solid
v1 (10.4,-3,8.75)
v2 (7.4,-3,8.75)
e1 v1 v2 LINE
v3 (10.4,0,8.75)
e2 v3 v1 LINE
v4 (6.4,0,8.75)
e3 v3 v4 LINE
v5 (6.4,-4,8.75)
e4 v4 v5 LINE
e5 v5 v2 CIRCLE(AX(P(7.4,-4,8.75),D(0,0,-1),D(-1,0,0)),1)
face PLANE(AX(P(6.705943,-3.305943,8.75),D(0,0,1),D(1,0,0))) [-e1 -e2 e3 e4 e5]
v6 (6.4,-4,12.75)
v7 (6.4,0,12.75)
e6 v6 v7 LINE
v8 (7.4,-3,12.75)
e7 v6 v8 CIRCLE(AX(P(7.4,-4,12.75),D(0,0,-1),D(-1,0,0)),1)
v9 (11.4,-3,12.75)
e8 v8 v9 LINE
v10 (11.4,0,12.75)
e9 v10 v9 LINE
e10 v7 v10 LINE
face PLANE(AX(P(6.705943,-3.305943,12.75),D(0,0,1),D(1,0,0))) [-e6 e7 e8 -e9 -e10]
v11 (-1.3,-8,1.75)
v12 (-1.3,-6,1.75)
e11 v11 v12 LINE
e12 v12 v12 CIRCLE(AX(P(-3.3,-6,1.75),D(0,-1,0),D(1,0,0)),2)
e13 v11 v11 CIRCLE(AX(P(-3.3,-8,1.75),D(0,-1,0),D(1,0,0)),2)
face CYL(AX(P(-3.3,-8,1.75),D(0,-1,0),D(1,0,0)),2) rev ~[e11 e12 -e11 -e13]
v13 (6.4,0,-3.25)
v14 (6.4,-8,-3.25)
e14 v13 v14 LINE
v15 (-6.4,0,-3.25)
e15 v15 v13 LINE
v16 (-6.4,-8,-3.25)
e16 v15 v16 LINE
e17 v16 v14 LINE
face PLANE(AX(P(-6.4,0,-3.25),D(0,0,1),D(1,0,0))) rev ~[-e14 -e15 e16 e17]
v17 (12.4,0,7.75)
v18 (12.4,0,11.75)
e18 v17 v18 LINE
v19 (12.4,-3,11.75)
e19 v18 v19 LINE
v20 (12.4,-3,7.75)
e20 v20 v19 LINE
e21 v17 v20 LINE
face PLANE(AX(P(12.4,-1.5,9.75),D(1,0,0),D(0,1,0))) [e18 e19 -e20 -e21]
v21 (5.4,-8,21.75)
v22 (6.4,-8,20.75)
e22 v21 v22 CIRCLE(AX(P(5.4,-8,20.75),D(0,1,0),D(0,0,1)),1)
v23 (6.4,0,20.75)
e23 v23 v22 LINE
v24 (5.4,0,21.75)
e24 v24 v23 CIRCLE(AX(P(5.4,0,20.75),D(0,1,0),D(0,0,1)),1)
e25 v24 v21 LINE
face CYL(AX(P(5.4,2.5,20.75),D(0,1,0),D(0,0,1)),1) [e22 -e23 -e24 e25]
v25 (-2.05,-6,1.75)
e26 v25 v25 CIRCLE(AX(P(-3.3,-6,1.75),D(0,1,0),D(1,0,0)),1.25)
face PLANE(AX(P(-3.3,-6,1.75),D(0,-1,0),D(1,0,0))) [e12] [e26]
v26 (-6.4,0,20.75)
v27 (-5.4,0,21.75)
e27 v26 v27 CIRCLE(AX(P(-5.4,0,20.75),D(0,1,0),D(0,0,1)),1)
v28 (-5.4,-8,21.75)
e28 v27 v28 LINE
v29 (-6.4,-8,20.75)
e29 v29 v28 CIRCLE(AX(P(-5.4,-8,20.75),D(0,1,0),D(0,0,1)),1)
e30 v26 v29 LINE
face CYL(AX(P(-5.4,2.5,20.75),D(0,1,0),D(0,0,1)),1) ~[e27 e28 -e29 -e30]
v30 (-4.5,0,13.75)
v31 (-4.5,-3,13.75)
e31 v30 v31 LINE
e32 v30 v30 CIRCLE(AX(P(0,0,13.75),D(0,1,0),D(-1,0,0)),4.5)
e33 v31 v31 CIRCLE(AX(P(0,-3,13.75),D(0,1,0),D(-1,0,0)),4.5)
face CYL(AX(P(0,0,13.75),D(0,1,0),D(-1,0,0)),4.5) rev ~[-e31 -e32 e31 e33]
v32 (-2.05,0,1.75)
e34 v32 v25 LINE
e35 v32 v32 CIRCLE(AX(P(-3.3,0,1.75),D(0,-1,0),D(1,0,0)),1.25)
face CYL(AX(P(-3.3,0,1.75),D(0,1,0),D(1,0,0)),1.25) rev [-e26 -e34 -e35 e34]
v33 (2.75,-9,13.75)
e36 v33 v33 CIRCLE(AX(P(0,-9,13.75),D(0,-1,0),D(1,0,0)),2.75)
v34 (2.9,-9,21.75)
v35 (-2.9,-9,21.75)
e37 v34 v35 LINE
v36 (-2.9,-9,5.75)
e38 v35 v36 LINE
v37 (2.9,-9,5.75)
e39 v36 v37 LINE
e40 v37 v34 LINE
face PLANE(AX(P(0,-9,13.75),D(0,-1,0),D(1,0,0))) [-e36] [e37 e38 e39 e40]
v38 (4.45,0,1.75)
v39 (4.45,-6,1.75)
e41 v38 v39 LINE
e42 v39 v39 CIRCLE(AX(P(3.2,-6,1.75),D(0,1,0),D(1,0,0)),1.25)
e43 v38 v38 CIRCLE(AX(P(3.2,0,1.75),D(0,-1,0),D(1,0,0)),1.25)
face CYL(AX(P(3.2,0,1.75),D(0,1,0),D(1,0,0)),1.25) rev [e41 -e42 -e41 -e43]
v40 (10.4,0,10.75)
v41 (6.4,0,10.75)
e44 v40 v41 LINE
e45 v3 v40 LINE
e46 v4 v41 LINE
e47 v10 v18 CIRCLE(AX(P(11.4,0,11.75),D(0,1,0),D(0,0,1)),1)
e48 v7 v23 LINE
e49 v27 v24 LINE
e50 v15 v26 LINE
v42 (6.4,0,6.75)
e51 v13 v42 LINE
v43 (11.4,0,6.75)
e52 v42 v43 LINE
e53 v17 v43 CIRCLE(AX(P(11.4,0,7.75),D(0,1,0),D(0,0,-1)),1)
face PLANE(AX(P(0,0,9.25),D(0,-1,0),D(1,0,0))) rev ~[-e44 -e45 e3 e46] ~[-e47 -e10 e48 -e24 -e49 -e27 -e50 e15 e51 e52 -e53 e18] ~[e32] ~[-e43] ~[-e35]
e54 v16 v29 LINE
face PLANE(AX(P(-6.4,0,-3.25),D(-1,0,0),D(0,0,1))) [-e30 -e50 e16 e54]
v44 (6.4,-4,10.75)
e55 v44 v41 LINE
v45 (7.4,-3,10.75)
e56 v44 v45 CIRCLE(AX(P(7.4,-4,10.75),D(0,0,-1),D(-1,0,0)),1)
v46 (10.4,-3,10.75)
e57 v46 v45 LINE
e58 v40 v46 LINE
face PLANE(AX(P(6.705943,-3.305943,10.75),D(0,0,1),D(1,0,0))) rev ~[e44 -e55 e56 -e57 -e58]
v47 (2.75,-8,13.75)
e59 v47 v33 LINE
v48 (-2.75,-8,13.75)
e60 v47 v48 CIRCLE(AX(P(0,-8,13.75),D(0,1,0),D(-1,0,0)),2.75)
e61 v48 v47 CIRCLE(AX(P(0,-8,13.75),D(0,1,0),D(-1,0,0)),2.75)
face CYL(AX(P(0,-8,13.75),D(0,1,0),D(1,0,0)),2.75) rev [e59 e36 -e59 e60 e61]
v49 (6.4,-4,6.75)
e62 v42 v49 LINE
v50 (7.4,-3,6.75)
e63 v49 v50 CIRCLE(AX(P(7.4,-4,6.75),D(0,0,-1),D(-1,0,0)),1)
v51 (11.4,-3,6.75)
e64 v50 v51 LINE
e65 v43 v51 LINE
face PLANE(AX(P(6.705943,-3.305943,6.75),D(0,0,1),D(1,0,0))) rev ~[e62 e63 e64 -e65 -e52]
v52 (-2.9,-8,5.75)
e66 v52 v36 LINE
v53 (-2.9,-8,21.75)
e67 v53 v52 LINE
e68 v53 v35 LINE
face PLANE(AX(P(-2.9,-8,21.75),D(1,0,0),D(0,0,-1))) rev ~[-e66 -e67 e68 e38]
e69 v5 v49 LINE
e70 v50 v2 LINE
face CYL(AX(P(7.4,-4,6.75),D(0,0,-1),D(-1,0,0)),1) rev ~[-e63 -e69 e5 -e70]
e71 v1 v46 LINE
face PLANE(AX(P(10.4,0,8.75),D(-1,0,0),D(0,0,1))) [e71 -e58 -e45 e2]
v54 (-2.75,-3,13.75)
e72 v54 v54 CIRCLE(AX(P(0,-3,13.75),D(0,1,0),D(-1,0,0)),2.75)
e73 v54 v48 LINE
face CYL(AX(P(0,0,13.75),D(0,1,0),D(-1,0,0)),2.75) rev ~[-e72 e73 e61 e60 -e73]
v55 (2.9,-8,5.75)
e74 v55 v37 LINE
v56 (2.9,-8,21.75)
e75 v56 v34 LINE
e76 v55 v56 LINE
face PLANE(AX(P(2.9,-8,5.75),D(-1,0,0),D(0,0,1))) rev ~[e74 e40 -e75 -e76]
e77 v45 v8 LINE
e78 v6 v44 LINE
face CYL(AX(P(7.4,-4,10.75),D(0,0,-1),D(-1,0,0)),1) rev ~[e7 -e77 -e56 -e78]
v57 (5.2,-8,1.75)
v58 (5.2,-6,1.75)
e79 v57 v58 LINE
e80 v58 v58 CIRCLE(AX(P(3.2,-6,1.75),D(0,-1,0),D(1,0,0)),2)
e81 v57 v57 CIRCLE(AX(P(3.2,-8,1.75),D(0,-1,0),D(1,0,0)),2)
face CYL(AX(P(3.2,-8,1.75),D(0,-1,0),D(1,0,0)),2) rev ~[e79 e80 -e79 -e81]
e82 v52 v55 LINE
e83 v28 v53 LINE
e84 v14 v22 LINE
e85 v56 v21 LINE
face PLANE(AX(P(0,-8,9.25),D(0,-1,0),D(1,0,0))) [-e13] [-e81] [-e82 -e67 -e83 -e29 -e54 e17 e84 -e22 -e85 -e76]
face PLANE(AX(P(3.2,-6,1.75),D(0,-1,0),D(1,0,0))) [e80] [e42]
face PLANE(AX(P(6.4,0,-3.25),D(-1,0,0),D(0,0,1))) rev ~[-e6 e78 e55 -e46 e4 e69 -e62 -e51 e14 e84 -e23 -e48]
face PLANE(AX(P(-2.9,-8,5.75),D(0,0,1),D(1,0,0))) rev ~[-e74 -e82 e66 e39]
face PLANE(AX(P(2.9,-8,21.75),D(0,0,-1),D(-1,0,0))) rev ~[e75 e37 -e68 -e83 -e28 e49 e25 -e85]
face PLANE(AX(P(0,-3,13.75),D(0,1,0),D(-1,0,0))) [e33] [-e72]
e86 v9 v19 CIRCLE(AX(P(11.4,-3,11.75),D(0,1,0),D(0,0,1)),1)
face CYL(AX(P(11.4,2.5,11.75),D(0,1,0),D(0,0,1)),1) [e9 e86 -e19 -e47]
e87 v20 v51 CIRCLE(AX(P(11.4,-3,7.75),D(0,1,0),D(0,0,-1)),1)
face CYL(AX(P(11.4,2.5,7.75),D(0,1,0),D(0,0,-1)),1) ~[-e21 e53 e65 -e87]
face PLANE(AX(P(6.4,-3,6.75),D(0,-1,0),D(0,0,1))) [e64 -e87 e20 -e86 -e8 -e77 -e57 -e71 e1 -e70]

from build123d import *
from build123d import SkipClean  # not in build123d's __all__

# Parameters (mm, degrees)
F1_W          = 12.8
F1_H          = 25
F1_R          = 1.25
F2_DEPTH      = 8
F3_R          = 2.75
F4_DEPTH      = 8.001
F5_R          = 2
F6_DEPTH      = 2
F7_R          = 2.75
F8_DEPTH      = 1
F9_W          = 3
F9_H          = 6
F10_DEPTH     = 6
F11_W         = 4
F11_H         = 2
F12_DEPTH     = 3
F13_T1_DEPTH  = 2
F13_T3_DEPTH  = 2
F13_T8_DEPTH  = 4.5
F13_T13_DEPTH = 4.5
F13_T15_DEPTH = 8
F13_T17_DEPTH = 13
F14_R         = 4.5
F15_DEPTH     = 3


# Not quite as in the source:
# - a fillet or chamfer that OpenCascade refuses, or shapes differently, is made with other operations: its cross-section is extruded or revolved along the edge and cut away or added
# - after a boolean that leaves OpenCascade's solid faulty, fix() repairs it


with BuildPart() as f2:
    # F1 (on Front) → F2 (new body)
    with BuildSketch(Plane.XZ):
        with Locations((0, 9.25)):
            Rectangle(F1_W, F1_H)
        with Locations((-3.3, 1.75)):
            Circle(F1_R, mode=Mode.SUBTRACT)
        with Locations((3.2, 1.75)):
            Circle(F1_R, mode=Mode.SUBTRACT)
    extrude(amount=F2_DEPTH)

    # F3 (on face) → F4 (cut, through all)
    with BuildSketch(Plane(origin=(0, 0, 0), x_dir=(-1, 0, 0), z_dir=(0, 1, 0))):
        with Locations((0, 13.75)):
            Circle(F3_R)
    extrude(amount=-F4_DEPTH, mode=Mode.SUBTRACT)

    # F5 (on face) → F6 (cut)
    with BuildSketch(Plane.XZ.offset(8)):
        with Locations((-3.3, 1.75)):
            Circle(F5_R)
        with Locations((3.2, 1.75)):
            Circle(F5_R)
    extrude(amount=-F6_DEPTH, mode=Mode.SUBTRACT)

    # F7 (on face) → F8 (join)
    with BuildSketch(Plane.XZ.offset(8)):
        Polygon((-2.9, 5.75), (0, 5.75), (2.9, 5.75), (2.9, 21.75), (0, 21.75), (-2.9, 21.75), align=None)
        with Locations((0, 13.75)):
            Circle(F7_R, mode=Mode.SUBTRACT)
    with SkipClean():  # cleaning this boolean's faces spoils the solid; the shape is the same uncleaned
        extrude(amount=F8_DEPTH)

    # F9 (on face) → F10 (join)
    with BuildSketch(Plane.YZ.offset(6.4)):
        with Locations((-1.5, 9.75)):
            Rectangle(F9_W, F9_H)
    extrude(amount=F10_DEPTH)

    add(f2.part.fix(), mode=Mode.REPLACE)

    # F11 (on face) → F12 (cut, through all)
    with BuildSketch(Plane(origin=(0, 0, 0), x_dir=(-1, 0, 0), z_dir=(0, 1, 0))):
        with Locations((-8.4, 9.75)):
            Rectangle(F11_W, F11_H)
    extrude(amount=-F12_DEPTH, mode=Mode.SUBTRACT)

    add(f2.part.fix(), mode=Mode.REPLACE)

    # F13: fillet of radius 1 on 6 edges, made by hand

    # F13_s2 → F13_t1 (join)
    with BuildSketch(Plane.XY.offset(10.75)):
        with BuildLine():
            ThreePointArc((6.4, -4), (6.6928932188, -3.2928932188), (7.4, -3))
            Line((7.4, -3), (6.4, -3))
            Line((6.4, -3), (6.4, -4))
        make_face()
    extrude(amount=F13_T1_DEPTH)

    # F13_s4 → F13_t3 (join)
    with BuildSketch(Plane.XY.offset(6.75)):
        with BuildLine():
            ThreePointArc((6.4, -4), (6.6928932188, -3.2928932188), (7.4, -3))
            Line((7.4, -3), (6.4, -3))
            Line((6.4, -3), (6.4, -4))
        make_face()
    extrude(amount=F13_T3_DEPTH)


with BuildPart() as f13_tool6:
    # F13_s7 → F13_t8 (new body)
    with BuildSketch(Plane.XY.offset(12.75)):
        with BuildLine():
            ThreePointArc((6.4, -4), (6.6928932188, -3.2928932188), (7.4, -3))
            Line((7.4, -3), (6.4, -3))
            Line((6.4, -3), (6.4, -4))
        make_face()
    extrude(amount=-F13_T8_DEPTH)

    split(bisect_by=Plane.XY.offset(8.75), keep=Keep.BOTTOM)


with BuildPart() as f2_1:
    add(f2.part, clean=False)

    # F13_t5: union F13_tool6
    add(f13_tool6.part)


with BuildPart() as f13_tool11:
    # F13_s12 → F13_t13 (new body)
    with BuildSketch(Plane.XY.offset(11.25)):
        with BuildLine():
            ThreePointArc((6.4, -4), (6.6928932188, -3.2928932188), (7.4, -3))
            Line((7.4, -3), (6.4, -3))
            Line((6.4, -3), (6.4, -4))
        make_face()
    extrude(amount=-F13_T13_DEPTH)

    split(bisect_by=Plane.XY.offset(10.75), keep=Keep.TOP)


with BuildPart() as f2_2:
    add(f2_1.part, clean=False)

    # F13_t10: union F13_tool11
    add(f13_tool11.part)

    # F13_s16 → F13_t15 (cut)
    with BuildSketch(Plane.XZ.offset(-2.5)):
        with BuildLine():
            ThreePointArc((11.4, 6.75), (12.1071067812, 7.0428932188), (12.4, 7.75))
            Line((12.4, 7.75), (12.4, 6.75))
            Line((12.4, 6.75), (11.4, 6.75))
        make_face()
        with BuildLine():
            ThreePointArc((11.4, 12.75), (12.1071067812, 12.4571067812), (12.4, 11.75))
            Line((12.4, 11.75), (12.4, 12.75))
            Line((12.4, 12.75), (11.4, 12.75))
        make_face()
    extrude(amount=F13_T15_DEPTH, mode=Mode.SUBTRACT)

    # F13_s18 → F13_t17 (cut)
    with BuildSketch(Plane.XZ.offset(-2.5)):
        with BuildLine():
            ThreePointArc((5.4, 21.75), (6.1071067812, 21.4571067812), (6.4, 20.75))
            Line((6.4, 20.75), (6.4, 21.75))
            Line((6.4, 21.75), (5.4, 21.75))
        make_face()
        with BuildLine():
            ThreePointArc((-5.4, 21.75), (-6.1071067812, 21.4571067812), (-6.4, 20.75))
            Line((-6.4, 20.75), (-6.4, 21.75))
            Line((-6.4, 21.75), (-5.4, 21.75))
        make_face()
    extrude(amount=F13_T17_DEPTH, mode=Mode.SUBTRACT)

    # F14 (on face) → F15 (cut)
    with BuildSketch(Plane(origin=(0, 0, 0), x_dir=(-1, 0, 0), z_dir=(0, 1, 0))):
        with Locations((0, 13.75)):
            Circle(F14_R)
    extrude(amount=-F15_DEPTH, mode=Mode.SUBTRACT)


solid = f2_2.part
